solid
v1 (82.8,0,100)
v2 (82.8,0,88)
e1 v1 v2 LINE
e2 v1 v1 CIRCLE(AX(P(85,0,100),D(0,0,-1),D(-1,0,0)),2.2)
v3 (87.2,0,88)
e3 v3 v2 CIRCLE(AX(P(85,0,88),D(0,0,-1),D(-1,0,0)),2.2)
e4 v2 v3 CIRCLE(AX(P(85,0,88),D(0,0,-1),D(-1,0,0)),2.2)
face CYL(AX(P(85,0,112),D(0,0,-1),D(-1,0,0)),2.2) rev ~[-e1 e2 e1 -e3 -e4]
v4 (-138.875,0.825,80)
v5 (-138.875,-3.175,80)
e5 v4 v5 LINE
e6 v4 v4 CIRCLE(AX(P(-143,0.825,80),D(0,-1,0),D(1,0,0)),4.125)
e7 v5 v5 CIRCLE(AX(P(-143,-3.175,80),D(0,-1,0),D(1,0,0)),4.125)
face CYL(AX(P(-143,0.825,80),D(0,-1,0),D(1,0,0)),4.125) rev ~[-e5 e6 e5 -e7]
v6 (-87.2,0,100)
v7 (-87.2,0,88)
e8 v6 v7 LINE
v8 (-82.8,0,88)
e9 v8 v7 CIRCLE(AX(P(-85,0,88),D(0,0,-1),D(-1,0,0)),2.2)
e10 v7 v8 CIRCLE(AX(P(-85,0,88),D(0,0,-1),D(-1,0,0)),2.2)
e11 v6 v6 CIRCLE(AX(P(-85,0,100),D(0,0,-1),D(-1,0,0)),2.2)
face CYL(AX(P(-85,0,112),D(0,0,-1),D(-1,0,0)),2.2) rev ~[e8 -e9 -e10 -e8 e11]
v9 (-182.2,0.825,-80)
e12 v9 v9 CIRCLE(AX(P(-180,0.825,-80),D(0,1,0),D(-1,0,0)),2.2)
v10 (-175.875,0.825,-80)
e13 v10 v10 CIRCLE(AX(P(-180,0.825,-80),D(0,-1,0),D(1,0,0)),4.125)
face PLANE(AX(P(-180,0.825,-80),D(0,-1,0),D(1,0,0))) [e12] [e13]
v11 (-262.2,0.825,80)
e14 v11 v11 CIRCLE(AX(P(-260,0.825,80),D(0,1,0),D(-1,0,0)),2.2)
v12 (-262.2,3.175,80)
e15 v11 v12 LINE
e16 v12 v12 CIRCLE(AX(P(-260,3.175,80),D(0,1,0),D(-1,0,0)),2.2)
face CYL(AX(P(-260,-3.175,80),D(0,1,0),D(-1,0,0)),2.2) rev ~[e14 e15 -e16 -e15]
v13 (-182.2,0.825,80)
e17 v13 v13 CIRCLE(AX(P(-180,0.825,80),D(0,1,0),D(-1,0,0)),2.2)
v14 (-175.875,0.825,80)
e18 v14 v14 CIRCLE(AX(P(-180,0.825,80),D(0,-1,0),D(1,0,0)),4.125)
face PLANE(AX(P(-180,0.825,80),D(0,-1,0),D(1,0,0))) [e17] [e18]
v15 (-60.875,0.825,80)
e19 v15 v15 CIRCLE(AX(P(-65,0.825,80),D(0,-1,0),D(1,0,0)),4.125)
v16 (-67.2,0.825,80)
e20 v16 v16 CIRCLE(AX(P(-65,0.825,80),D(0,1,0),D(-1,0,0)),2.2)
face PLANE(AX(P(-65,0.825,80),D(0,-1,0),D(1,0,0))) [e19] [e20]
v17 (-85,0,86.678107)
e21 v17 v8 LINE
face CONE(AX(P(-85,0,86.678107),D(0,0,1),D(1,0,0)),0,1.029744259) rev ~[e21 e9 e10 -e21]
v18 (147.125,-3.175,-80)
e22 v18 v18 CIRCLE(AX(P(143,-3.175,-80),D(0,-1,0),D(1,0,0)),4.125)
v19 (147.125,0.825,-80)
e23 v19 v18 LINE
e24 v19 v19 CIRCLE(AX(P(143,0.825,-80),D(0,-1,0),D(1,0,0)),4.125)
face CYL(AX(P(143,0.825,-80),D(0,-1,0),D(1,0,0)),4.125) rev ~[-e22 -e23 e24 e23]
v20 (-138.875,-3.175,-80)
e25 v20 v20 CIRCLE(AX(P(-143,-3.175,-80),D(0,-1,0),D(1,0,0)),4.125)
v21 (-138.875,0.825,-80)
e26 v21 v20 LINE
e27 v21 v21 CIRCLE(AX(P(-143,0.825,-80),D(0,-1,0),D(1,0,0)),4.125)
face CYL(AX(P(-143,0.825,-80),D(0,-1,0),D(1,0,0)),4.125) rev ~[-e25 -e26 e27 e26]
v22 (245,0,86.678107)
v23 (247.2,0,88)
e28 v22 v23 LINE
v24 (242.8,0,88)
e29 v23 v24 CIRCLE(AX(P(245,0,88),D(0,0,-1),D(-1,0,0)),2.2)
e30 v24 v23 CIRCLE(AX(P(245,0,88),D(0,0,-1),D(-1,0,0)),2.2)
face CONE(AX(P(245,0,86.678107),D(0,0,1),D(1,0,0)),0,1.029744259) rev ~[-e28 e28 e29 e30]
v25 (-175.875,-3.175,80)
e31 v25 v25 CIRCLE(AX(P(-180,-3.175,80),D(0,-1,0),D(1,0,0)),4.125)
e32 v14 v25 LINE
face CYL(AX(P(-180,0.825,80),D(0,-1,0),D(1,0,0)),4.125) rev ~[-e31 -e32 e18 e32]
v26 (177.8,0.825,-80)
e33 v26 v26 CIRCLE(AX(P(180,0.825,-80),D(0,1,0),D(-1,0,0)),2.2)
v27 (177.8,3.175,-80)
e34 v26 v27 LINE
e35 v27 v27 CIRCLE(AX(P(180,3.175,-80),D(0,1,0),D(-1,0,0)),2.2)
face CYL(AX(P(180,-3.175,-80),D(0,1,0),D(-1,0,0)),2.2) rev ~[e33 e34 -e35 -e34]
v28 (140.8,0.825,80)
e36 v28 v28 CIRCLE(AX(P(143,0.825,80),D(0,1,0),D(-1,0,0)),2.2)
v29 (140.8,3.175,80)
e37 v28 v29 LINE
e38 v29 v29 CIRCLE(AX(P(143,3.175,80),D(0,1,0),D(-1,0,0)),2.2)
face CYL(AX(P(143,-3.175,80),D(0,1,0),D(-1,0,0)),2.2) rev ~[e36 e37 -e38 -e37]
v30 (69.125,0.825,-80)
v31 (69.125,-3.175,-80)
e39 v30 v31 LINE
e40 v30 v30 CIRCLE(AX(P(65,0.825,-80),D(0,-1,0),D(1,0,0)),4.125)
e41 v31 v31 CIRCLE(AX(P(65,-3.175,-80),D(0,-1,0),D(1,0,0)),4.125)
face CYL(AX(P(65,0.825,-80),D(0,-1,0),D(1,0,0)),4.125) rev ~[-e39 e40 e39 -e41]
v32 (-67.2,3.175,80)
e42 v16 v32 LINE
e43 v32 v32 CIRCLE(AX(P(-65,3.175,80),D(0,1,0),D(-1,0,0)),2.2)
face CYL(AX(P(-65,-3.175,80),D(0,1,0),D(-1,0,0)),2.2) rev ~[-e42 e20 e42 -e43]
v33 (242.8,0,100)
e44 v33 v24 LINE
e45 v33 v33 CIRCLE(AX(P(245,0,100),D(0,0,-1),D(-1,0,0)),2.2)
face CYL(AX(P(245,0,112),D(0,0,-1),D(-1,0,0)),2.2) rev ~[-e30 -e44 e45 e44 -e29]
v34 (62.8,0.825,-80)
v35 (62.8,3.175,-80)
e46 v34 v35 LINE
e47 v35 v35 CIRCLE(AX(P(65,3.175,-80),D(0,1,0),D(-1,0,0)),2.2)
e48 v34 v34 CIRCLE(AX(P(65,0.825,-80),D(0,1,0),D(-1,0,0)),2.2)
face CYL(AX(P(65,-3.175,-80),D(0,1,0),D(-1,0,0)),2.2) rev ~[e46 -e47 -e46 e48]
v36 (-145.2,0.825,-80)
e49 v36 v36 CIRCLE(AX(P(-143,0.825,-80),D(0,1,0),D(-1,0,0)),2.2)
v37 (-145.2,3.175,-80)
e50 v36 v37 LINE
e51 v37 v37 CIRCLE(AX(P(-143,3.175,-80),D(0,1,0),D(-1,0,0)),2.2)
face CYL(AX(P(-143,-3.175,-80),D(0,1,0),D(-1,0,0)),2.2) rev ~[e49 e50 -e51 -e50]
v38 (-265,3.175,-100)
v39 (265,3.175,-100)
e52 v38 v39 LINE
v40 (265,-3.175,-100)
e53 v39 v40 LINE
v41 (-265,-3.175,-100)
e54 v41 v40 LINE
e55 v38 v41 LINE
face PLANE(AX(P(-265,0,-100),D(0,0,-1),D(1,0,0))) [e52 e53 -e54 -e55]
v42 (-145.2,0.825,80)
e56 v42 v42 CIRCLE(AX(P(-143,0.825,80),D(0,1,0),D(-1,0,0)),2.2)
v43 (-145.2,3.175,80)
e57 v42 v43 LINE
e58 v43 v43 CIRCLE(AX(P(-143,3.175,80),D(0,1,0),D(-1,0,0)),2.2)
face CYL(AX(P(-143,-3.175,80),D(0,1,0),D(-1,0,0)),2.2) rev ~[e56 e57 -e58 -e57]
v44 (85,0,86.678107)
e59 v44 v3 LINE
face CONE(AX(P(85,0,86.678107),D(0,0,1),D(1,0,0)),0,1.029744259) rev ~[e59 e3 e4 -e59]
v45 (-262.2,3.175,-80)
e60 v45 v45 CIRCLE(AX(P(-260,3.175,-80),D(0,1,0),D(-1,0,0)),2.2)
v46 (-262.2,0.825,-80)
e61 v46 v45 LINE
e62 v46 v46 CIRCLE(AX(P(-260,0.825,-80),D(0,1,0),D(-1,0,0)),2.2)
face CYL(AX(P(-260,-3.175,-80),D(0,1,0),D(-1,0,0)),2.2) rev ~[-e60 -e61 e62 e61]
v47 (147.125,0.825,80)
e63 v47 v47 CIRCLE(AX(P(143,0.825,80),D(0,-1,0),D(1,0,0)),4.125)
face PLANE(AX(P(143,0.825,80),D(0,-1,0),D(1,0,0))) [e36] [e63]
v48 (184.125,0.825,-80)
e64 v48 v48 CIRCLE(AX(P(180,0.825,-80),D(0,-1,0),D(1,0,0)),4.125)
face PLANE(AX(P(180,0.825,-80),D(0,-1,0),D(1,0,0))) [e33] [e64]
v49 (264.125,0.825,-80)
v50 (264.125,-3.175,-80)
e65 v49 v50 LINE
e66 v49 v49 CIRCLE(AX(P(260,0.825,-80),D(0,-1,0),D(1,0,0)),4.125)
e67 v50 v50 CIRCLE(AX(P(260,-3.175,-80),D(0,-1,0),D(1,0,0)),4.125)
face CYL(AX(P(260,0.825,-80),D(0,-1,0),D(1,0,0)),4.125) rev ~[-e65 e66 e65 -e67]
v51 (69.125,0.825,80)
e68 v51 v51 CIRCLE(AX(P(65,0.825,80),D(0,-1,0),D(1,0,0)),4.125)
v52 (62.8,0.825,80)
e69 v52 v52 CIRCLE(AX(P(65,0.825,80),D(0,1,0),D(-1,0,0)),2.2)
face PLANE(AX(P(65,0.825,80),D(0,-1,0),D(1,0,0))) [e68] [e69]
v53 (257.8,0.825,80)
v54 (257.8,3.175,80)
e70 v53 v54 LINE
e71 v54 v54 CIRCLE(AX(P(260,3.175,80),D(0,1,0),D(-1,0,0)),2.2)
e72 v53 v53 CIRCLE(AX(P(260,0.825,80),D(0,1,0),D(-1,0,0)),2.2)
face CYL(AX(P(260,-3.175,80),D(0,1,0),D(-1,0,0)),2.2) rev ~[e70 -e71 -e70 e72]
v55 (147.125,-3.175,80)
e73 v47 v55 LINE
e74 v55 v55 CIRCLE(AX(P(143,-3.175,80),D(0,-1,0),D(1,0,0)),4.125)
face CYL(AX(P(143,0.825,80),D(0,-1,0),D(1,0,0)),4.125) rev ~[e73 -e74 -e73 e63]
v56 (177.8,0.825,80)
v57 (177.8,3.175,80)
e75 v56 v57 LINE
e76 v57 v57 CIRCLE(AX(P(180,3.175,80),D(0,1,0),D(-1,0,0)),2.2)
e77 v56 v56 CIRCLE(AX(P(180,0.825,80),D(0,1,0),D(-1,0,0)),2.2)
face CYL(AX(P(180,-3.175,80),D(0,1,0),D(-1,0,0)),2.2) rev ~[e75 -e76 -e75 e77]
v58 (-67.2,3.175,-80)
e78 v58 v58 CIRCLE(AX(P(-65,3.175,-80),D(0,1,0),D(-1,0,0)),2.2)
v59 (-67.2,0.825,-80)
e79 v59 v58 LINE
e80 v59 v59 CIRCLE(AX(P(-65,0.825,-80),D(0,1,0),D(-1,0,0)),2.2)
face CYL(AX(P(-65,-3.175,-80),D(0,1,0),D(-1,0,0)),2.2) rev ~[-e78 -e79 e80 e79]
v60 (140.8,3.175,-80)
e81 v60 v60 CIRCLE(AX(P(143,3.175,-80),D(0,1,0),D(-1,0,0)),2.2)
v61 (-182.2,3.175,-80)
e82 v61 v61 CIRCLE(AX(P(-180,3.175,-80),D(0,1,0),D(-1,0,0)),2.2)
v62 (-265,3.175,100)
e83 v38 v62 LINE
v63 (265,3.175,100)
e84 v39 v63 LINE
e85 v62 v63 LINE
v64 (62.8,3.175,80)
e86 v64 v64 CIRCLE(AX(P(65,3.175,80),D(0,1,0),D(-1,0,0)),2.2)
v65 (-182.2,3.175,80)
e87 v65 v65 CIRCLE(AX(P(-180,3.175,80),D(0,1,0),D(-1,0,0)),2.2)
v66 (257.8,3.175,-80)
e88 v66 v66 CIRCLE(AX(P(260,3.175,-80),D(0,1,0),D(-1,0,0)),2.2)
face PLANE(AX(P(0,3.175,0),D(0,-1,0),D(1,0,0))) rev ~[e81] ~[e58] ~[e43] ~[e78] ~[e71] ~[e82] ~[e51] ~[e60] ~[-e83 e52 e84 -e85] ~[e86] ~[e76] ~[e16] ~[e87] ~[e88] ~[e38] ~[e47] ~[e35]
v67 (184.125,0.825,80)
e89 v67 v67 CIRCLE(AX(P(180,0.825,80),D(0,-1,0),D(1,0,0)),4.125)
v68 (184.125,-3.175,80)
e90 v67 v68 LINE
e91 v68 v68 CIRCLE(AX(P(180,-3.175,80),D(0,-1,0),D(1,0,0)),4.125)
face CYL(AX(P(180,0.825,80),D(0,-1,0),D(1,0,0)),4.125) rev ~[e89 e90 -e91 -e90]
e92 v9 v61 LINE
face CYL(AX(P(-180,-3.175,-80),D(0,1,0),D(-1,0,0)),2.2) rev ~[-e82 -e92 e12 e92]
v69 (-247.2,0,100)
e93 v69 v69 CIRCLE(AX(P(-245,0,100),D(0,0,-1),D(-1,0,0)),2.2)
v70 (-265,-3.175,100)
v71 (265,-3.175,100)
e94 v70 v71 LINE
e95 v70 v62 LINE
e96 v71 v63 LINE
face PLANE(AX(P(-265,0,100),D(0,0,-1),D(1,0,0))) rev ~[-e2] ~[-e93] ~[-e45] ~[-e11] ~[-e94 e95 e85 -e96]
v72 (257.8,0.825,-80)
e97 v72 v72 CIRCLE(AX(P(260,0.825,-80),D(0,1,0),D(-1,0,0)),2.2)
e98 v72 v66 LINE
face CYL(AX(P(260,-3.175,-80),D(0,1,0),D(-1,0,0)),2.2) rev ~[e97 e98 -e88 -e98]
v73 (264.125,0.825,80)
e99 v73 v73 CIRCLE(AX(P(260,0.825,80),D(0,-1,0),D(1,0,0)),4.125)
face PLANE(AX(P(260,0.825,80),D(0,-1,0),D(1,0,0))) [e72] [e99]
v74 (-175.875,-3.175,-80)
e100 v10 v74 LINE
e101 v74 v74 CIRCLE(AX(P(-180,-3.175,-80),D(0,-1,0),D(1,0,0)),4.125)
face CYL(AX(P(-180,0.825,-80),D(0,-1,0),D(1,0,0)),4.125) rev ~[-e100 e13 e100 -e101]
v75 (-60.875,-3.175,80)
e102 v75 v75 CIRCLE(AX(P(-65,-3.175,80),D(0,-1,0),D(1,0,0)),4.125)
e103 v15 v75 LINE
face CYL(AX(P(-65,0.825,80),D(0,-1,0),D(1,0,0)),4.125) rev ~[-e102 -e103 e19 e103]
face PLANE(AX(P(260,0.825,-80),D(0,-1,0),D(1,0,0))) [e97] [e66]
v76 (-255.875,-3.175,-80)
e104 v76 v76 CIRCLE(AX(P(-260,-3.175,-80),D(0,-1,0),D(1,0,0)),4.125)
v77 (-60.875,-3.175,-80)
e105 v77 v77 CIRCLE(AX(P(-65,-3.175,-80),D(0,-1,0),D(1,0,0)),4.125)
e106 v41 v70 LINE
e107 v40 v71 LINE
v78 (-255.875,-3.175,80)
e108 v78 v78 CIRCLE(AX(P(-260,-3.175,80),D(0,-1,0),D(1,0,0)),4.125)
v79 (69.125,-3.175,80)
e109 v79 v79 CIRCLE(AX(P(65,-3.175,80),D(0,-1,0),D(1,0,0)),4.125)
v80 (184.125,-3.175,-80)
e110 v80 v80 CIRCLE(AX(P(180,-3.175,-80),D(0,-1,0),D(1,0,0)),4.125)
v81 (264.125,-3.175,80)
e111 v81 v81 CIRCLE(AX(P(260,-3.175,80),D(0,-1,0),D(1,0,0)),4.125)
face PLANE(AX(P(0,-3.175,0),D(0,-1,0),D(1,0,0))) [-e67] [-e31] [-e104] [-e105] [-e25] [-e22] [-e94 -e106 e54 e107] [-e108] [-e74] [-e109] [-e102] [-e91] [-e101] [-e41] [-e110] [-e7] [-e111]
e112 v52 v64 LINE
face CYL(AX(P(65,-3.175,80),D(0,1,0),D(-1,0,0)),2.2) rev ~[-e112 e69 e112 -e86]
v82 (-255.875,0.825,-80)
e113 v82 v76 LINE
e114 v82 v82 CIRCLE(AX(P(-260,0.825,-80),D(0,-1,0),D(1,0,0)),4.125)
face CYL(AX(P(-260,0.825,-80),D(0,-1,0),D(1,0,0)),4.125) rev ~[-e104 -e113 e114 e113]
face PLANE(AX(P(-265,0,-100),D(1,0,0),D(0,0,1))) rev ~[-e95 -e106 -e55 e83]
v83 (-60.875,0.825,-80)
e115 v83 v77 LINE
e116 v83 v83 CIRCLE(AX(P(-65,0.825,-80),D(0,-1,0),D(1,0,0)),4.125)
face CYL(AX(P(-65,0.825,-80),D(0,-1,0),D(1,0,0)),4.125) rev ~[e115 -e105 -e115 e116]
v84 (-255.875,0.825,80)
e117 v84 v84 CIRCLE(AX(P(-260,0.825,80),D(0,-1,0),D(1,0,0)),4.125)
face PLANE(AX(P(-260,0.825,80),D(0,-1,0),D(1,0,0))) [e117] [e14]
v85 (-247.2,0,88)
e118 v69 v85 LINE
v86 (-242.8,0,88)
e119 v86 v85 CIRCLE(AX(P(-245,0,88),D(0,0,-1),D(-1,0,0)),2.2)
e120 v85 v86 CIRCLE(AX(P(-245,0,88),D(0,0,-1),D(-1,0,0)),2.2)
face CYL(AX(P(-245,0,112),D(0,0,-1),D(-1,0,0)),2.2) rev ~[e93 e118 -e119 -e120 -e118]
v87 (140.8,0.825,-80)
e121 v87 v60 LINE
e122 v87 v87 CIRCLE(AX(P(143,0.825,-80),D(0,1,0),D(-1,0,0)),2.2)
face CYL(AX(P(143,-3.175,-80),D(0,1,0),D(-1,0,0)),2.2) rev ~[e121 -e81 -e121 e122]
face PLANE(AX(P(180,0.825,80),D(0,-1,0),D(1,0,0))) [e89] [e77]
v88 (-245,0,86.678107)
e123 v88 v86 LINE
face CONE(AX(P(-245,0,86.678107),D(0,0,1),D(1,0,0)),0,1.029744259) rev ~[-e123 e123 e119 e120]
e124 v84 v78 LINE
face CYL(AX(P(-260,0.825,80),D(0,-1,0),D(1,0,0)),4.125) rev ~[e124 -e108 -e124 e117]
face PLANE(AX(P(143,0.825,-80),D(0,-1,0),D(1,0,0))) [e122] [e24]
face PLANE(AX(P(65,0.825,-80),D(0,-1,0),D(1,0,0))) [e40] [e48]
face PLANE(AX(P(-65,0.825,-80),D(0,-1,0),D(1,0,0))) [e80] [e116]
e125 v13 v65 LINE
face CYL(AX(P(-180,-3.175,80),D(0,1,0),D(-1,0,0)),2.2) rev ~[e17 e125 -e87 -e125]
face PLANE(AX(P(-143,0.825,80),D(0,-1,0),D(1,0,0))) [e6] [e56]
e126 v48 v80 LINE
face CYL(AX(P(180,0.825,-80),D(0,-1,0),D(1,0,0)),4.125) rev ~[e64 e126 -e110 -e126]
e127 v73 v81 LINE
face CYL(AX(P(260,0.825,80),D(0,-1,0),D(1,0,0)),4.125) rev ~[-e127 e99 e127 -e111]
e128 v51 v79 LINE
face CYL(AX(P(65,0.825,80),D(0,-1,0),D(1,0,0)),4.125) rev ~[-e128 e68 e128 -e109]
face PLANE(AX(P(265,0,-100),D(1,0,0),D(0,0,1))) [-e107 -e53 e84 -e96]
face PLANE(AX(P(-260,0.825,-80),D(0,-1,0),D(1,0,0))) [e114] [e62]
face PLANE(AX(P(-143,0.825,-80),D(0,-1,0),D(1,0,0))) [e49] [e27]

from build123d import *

# Parameters (mm, degrees)
F0_W           = 530
F0_H           = 200
F1_DEPTH       = 3.175
F3_D           = 4.4
F3_DEPTH       = 12
F3_TIP         = 1.3218933619
F5_D           = 4.4
F5_DEPTH       = 10
F5_CBORE_D     = 8.25
F5_CBORE_DEPTH = 4
F5_TIP         = 1.3218933619


# Not quite as in the source:
# - a feature names something its author has since deleted; it is built from what else it names


with BuildPart() as f1:
    # F0 (on Front) → F1 (new body, symmetric)
    with BuildSketch(Plane.XZ):
        Rectangle(F0_W, F0_H)
    extrude(amount=F1_DEPTH, both=True)

    # F3
    with Locations(Plane.XY.offset(100)):
        with Locations((-245, 0), (245, 0), (-85, 0), (85, 0)):
            Hole(F3_D / 2, depth=F3_DEPTH)
            with Locations((0, 0, -(F3_DEPTH + F3_TIP / 2))):  # 118° drill point
                Cone(0, F3_D / 2, F3_TIP, mode=Mode.SUBTRACT)

    # F5
    with Locations(Plane.XZ.offset(3.175)):
        with Locations((-260, 80), (-260, -80), (180, -80), (180, 80), (-143, -80), (-143, 80), (143, -80), (143, 80), (65, -80), (65, 80), (-65, 80), (-65, -80), (260, 80), (260, -80), (-180, 80), (-180, -80)):
            CounterBoreHole(F5_D / 2, F5_CBORE_D / 2, F5_CBORE_DEPTH, depth=F5_DEPTH)
            with Locations((0, 0, -(F5_DEPTH + F5_TIP / 2))):  # 118° drill point
                Cone(0, F5_D / 2, F5_TIP, mode=Mode.SUBTRACT)


solid = f1.part
